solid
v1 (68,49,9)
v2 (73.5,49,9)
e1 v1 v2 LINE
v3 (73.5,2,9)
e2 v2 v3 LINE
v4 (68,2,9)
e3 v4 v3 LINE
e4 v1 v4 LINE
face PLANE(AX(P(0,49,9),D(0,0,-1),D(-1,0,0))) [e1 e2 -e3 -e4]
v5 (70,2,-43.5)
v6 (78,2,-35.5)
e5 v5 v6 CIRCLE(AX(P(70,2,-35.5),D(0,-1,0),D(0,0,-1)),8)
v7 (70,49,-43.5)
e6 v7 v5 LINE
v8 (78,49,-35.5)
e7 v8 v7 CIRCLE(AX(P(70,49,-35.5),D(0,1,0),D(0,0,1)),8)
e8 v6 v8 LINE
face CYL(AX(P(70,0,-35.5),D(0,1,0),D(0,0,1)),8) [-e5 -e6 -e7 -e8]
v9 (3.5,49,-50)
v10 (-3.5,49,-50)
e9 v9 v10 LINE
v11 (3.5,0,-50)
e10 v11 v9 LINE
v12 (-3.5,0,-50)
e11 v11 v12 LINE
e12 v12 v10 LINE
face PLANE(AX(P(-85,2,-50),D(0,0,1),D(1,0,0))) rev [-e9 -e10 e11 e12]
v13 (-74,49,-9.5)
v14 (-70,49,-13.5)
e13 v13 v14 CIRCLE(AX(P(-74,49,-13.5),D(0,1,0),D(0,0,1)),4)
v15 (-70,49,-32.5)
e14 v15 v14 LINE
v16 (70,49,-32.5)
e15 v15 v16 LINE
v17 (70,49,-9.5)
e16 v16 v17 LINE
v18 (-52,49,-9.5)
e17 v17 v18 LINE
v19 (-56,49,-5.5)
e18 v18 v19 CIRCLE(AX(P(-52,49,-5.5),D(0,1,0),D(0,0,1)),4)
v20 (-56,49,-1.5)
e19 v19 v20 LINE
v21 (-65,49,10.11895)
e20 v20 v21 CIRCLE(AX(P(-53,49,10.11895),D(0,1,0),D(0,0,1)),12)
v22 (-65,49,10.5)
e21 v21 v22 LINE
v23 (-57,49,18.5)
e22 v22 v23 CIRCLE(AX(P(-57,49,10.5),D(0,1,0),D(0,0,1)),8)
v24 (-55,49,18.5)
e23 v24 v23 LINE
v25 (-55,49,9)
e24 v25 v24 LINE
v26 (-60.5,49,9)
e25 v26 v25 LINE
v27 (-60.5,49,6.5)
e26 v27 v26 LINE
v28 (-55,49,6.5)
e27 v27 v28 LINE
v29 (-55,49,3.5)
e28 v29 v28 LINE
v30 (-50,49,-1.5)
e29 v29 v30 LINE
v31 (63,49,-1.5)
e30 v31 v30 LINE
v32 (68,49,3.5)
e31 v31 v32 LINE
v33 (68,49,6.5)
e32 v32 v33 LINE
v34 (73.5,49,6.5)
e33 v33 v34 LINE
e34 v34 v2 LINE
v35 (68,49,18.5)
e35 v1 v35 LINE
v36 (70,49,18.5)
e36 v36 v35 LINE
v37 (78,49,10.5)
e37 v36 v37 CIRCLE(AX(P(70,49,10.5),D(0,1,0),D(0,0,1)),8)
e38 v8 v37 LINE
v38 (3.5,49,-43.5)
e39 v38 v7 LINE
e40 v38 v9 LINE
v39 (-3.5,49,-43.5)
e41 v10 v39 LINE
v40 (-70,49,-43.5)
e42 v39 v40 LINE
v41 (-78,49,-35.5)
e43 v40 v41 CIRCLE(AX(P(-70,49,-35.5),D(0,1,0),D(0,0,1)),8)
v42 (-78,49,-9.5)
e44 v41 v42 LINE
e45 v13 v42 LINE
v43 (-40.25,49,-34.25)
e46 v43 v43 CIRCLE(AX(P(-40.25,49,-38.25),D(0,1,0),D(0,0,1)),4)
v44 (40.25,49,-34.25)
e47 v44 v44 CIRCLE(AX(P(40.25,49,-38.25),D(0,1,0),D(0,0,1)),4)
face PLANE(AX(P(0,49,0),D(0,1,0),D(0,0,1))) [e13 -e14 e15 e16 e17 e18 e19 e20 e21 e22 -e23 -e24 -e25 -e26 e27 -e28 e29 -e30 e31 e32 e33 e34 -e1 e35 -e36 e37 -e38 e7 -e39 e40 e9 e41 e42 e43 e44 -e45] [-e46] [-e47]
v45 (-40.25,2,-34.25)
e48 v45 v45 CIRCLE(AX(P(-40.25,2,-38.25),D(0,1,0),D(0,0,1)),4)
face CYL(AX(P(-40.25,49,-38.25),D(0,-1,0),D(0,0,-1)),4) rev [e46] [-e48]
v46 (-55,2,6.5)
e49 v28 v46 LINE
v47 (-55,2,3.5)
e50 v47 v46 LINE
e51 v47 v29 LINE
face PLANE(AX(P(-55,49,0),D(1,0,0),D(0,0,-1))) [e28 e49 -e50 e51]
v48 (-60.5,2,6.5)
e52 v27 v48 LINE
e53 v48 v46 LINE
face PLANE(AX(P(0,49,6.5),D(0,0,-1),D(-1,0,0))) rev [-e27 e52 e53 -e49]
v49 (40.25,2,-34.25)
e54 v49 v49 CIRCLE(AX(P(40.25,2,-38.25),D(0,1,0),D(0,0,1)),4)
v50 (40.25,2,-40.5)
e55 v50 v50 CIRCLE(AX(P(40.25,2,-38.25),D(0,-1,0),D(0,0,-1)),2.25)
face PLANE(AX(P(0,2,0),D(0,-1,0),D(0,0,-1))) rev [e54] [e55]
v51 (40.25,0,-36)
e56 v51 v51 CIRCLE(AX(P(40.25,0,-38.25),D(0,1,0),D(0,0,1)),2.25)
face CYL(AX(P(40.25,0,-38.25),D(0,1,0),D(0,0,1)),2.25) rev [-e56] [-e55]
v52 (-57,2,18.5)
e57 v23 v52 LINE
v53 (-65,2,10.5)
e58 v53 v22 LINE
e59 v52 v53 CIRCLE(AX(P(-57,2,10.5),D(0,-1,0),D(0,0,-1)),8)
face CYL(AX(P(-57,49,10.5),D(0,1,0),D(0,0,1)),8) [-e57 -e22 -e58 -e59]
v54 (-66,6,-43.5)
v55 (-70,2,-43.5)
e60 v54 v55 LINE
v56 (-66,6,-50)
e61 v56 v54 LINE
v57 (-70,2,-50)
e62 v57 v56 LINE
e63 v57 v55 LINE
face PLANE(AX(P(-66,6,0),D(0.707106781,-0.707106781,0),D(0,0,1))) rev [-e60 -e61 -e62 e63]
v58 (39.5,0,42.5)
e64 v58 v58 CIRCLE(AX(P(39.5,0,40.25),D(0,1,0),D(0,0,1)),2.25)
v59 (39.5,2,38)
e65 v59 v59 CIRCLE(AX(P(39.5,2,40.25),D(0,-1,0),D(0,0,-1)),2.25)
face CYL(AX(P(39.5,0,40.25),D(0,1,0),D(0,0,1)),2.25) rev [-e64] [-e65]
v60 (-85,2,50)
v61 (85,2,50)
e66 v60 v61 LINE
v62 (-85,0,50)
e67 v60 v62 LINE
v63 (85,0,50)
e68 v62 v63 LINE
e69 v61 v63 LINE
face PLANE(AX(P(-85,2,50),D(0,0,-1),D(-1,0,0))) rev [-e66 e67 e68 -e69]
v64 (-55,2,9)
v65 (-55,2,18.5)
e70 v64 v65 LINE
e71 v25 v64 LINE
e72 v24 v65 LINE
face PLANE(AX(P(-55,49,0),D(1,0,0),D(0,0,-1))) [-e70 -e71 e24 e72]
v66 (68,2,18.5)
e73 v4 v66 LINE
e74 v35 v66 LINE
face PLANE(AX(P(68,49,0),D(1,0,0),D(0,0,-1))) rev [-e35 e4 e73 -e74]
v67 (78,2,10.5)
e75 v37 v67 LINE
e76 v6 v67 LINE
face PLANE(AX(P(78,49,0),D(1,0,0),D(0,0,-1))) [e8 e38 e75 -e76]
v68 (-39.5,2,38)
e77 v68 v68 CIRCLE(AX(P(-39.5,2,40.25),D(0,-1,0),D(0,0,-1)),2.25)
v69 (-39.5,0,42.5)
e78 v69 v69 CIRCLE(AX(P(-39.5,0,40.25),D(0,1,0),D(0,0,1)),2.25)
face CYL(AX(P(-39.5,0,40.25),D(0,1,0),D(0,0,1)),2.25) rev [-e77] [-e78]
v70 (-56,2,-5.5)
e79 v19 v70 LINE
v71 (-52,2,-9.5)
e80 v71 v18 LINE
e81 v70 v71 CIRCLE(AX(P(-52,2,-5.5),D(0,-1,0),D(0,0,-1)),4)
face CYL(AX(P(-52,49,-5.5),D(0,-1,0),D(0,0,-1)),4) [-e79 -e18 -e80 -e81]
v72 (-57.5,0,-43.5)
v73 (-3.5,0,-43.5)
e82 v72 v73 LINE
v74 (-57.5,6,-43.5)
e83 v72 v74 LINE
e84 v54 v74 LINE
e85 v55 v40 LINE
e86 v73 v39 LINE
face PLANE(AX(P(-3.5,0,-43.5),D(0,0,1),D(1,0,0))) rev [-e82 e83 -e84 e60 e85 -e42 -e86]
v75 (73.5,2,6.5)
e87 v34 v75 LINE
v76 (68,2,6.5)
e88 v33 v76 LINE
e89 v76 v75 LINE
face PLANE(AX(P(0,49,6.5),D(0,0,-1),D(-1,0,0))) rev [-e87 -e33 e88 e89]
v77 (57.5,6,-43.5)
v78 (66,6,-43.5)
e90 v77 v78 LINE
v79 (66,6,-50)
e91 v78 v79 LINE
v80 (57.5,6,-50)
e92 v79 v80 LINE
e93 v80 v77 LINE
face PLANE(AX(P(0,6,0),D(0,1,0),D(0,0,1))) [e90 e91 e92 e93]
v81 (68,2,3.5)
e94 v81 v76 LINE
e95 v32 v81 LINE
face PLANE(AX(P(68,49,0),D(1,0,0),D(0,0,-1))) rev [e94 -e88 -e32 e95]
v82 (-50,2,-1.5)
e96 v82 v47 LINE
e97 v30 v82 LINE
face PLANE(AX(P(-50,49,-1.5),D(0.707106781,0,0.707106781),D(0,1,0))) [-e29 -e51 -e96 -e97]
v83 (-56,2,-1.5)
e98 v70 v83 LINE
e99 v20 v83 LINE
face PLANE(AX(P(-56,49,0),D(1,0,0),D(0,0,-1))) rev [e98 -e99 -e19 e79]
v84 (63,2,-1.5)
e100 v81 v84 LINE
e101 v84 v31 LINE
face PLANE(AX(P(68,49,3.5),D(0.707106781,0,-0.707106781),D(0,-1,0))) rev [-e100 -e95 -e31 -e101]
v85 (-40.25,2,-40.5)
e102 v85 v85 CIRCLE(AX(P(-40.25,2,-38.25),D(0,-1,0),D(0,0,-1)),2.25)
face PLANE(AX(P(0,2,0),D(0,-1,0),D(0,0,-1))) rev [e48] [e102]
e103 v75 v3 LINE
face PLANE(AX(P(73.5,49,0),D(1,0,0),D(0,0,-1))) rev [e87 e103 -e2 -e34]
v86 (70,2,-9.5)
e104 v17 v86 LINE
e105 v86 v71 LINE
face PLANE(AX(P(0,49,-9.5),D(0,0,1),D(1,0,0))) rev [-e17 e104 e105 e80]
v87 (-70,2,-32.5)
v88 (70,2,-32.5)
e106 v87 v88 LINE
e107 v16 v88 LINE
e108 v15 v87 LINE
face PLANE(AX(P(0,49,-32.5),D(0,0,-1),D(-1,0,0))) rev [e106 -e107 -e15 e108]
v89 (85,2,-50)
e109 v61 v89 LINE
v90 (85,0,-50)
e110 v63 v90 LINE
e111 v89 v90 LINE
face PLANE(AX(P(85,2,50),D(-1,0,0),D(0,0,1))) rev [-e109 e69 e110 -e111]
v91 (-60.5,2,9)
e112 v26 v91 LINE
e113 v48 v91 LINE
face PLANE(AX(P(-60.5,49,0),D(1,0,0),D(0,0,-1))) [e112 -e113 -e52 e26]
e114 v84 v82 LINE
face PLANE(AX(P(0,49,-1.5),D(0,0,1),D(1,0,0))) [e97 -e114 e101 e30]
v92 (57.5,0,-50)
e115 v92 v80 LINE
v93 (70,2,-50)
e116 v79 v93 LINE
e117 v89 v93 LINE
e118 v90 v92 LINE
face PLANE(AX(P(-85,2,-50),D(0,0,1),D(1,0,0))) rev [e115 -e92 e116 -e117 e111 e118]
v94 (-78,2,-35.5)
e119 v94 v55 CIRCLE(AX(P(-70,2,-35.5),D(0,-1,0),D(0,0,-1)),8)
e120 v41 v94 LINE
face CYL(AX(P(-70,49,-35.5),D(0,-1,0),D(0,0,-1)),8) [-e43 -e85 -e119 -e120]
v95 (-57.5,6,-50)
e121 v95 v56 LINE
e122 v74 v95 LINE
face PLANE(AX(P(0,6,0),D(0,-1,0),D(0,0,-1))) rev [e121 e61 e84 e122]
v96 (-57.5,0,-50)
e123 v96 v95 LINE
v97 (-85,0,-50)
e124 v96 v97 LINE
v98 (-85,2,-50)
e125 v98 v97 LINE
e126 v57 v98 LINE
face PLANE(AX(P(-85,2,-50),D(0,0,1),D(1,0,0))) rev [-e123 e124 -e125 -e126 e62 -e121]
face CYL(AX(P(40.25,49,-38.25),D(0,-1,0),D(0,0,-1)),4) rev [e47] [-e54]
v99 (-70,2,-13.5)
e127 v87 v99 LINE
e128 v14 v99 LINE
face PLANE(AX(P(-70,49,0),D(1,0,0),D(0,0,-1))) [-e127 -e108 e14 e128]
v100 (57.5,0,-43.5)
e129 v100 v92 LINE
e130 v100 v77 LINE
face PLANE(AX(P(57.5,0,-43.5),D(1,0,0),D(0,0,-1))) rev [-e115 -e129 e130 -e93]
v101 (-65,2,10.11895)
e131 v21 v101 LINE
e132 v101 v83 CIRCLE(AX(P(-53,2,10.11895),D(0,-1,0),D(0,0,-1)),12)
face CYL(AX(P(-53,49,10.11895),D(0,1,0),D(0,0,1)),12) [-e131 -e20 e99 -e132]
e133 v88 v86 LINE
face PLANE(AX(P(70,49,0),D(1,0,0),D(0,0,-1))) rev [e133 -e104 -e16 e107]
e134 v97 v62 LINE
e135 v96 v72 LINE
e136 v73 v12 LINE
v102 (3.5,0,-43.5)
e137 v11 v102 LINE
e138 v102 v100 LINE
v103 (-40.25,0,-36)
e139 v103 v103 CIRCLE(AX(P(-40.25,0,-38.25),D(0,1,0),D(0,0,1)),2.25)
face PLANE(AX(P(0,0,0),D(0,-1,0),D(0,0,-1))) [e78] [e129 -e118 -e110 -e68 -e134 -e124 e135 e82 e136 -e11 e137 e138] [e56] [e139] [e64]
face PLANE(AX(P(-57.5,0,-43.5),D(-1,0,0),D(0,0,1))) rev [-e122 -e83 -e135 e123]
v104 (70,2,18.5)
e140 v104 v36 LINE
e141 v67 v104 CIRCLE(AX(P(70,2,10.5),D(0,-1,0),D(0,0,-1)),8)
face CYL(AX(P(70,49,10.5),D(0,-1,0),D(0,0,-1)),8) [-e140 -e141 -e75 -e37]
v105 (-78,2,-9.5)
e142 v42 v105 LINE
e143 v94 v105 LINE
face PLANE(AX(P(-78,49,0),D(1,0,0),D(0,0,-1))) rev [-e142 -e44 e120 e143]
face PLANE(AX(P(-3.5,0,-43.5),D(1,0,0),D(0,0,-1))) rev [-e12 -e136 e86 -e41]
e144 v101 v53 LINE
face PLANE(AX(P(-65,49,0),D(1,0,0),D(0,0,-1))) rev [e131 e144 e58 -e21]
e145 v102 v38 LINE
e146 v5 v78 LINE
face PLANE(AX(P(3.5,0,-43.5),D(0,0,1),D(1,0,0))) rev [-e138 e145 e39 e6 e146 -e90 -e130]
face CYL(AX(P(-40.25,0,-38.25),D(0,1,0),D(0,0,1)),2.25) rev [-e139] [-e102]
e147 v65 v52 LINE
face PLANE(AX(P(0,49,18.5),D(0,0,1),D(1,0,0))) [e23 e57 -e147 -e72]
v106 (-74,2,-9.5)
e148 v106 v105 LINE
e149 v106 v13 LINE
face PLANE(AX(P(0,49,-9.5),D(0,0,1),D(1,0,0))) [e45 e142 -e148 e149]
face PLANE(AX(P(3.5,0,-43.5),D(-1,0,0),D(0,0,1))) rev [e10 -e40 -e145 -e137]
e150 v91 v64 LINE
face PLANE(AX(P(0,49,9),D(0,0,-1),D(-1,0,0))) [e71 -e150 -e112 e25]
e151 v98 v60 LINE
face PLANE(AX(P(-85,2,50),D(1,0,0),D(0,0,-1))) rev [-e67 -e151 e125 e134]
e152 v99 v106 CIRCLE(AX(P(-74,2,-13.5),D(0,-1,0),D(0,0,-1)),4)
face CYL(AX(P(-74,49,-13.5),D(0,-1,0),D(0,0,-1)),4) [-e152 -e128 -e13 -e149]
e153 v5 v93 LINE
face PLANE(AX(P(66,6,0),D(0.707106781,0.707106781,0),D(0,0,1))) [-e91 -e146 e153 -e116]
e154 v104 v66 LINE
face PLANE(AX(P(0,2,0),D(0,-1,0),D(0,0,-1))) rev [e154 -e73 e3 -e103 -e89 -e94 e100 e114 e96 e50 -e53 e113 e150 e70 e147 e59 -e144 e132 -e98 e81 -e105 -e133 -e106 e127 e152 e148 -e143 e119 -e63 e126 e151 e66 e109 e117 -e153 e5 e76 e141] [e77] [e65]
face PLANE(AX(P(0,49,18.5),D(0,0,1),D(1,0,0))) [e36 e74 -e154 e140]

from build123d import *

# Parameters (mm, degrees)
SKETCH1_W               = 170
SKETCH1_H               = 100
BOSS_EXTRUDE1_DEPTH     = 2
CUT_EXTRUDE7_DEPTH      = 99.635693337
CUT_EXTRUDE7_DEPTH_BACK = 99.635693337
SKETCH14_R              = 2.25
CUT_EXTRUDE8_DEPTH      = 99.635693337
CUT_EXTRUDE8_DEPTH_BACK = 99.635693337
SKETCH15_W              = 54
SKETCH15_H              = 6.5
SKETCH16_R              = 4
SKETCH16_W              = 7
SKETCH16_H              = 6.5
BOSS_EXTRUDE4_DEPTH     = 47
FILLET1_R               = 4
CHAMFER1_SIZE           = 5
FILLET2_R               = 8
SKETCH17_W              = 12.5
SKETCH17_H              = 6.5
BOSS_EXTRUDE5_DEPTH     = 4
CHAMFER2_SIZE           = 4
FILLET3_R               = 12


# Some blends are built 0.0001 mm under size
with BuildPart() as part:
    # Sketch1 → Boss-Extrude1 (new body)
    with BuildSketch(Plane(origin=(0, 0, 0), x_dir=(1, 0, 0), z_dir=(0, 1, 0))):
        Rectangle(SKETCH1_W, SKETCH1_H)
    extrude(amount=BOSS_EXTRUDE1_DEPTH)

    # Sketch14 → Cut-Extrude7 (cut, two sides: drawn at the far end of the back side and taken through both)
    with BuildSketch(Plane(origin=(0, 2, 0), x_dir=(1, 0, 0), z_dir=(0, 1, 0)).offset(-CUT_EXTRUDE7_DEPTH_BACK)):
        with Locations(Location((-40.25, 38.25, 0), (0, 0, 270))):
            Circle(SKETCH14_R)
        with Locations(Location((40.25, 38.25, 0), (0, 0, 270))):
            Circle(SKETCH14_R)
        with Locations(Location((-39.5, -40.25, 0), (0, 0, 270))):
            Circle(SKETCH14_R)
        with Locations(Location((39.5, -40.25, 0), (0, 0, 270))):
            Circle(SKETCH14_R)
    extrude(amount=CUT_EXTRUDE7_DEPTH + CUT_EXTRUDE7_DEPTH_BACK, mode=Mode.SUBTRACT)

    # Sketch15 → Cut-Extrude8 (cut, two sides: drawn at the far end of the back side and taken through both)
    with BuildSketch(Plane(origin=(0, 2, 0), x_dir=(1, 0, 0), z_dir=(0, 1, 0)).offset(-CUT_EXTRUDE8_DEPTH_BACK)):
        with Locations((-30.5, 46.75)):
            Rectangle(SKETCH15_W, SKETCH15_H)
        with Locations((30.5, 46.75)):
            Rectangle(SKETCH15_W, SKETCH15_H)
    extrude(amount=CUT_EXTRUDE8_DEPTH + CUT_EXTRUDE8_DEPTH_BACK, mode=Mode.SUBTRACT)

    # Sketch16 → Boss-Extrude4 (add)
    # profile 1 of 7: a face of its own
    with BuildSketch(Plane(origin=(0, 2, 0), x_dir=(1, 0, 0), z_dir=(0, 1, 0))):
        Polygon((-70, 32.5), (-70, 43.5), (-78, 43.5), (-78, 9.5), (-70, 9.5), align=None)
    # profile 2 of 7: a face of its own
    with BuildSketch(Plane(origin=(0, 2, 0), x_dir=(1, 0, 0), z_dir=(0, 1, 0))):
        Polygon((-57.5, 43.5), (-70, 43.5), (-70, 32.5), (70, 32.5), (70, 43.5), (57.5, 43.5), (3.5, 43.5), (-3.5, 43.5), align=None)
        with Locations(Location((-40.25, 38.25, 0), (0, 0, 270))):
            Circle(SKETCH16_R, mode=Mode.SUBTRACT)
        with Locations(Location((40.25, 38.25, 0), (0, 0, 270))):
            Circle(SKETCH16_R, mode=Mode.SUBTRACT)
    # profile 3 of 7: a face of its own
    with BuildSketch(Plane(origin=(0, 2, 0), x_dir=(1, 0, 0), z_dir=(0, 1, 0))):
        with Locations((0, 46.75)):
            Rectangle(SKETCH16_W, SKETCH16_H)
    # profile 4 of 7: a face of its own
    with BuildSketch(Plane(origin=(0, 2, 0), x_dir=(1, 0, 0), z_dir=(0, 1, 0))):
        Polygon((70, 43.5), (70, 32.5), (70, 9.5), (78, 9.5), (78, 43.5), align=None)
    # profile 5 of 7: a face of its own
    with BuildSketch(Plane(origin=(0, 2, 0), x_dir=(1, 0, 0), z_dir=(0, 1, 0))):
        Polygon((78, 9.5), (70, 9.5), (-56, 9.5), (-56, 1.5), (-55, 1.5), (68, 1.5), (78, 1.5), align=None)
    # profile 6 of 7: a face of its own
    with BuildSketch(Plane(origin=(0, 2, 0), x_dir=(1, 0, 0), z_dir=(0, 1, 0))):
        Polygon((78, -18.5), (78, 1.5), (68, 1.5), (68, -6.5), (73.5, -6.5), (73.5, -9), (68, -9), (68, -18.5), align=None)
    # profile 7 of 7: a face of its own
    with BuildSketch(Plane(origin=(0, 2, 0), x_dir=(1, 0, 0), z_dir=(0, 1, 0))):
        Polygon((-55, 1.5), (-56, 1.5), (-65, 1.5), (-65, -18.5), (-55, -18.5), (-55, -9), (-60.5, -9), (-60.5, -6.5), (-55, -6.5), align=None)
    extrude(amount=BOSS_EXTRUDE4_DEPTH)

    # Fillet1
    fillet1_edges = [part.edges().sort_by_distance(p)[0] for p in [
        (-70, 25.5, -9.5),
        (-56, 25.5, -9.5),
    ]]
    fillet(fillet1_edges, radius=FILLET1_R)

    # Chamfer1
    chamfer1_edges = [part.edges().sort_by_distance(p)[0] for p in [
        (-55, 25.5, -1.5),
        (68, 25.5, -1.5),
    ]]
    chamfer(chamfer1_edges, length=CHAMFER1_SIZE)

    # Fillet2
    fillet2_edges = [part.edges().sort_by_distance(p)[0] for p in [
        (-78, 25.5, -43.5),
        (-65, 25.5, 18.5),
        (78, 25.5, 18.5),
        (78, 25.5, -43.5),
    ]]
    fillet(fillet2_edges, radius=FILLET2_R)

    # Sketch17 → Boss-Extrude5 (add)
    with BuildSketch(Plane(origin=(0, 2, 0), x_dir=(1, 0, 0), z_dir=(0, 1, 0))):
        with Locations((-63.75, 46.75)):
            Rectangle(SKETCH17_W, SKETCH17_H)
        with Locations((63.75, 46.75)):
            Rectangle(SKETCH17_W, SKETCH17_H)
    extrude(amount=BOSS_EXTRUDE5_DEPTH)

    # Chamfer2
    chamfer2_edges = [part.edges().sort_by_distance(p)[0] for p in [
        (70, 6, -46.75),
        (-70, 6, -46.75),
    ]]
    chamfer(chamfer2_edges, length=CHAMFER2_SIZE - 0.0001)  # a hair under: the kernel refuses the full size

    # Fillet3
    # the kernel refuses this fillet: 12 mm, written as the material it takes off along each edge
    with BuildSketch(Plane(origin=(-65, 2, -1.5), x_dir=(0, 0, 1), z_dir=(0, 1, 0))) as fillet3_piece_1:
        with BuildLine():
            CenterArc((11.618950039, 12), FILLET3_R, 194.477512186, 75.522487814)
            Line((0, 9), (0, 0))
            Line((0, 0), (11.618950039, 0))
        make_face()
    extrude(amount=76.047375097, mode=Mode.SUBTRACT)


solid = part.part
